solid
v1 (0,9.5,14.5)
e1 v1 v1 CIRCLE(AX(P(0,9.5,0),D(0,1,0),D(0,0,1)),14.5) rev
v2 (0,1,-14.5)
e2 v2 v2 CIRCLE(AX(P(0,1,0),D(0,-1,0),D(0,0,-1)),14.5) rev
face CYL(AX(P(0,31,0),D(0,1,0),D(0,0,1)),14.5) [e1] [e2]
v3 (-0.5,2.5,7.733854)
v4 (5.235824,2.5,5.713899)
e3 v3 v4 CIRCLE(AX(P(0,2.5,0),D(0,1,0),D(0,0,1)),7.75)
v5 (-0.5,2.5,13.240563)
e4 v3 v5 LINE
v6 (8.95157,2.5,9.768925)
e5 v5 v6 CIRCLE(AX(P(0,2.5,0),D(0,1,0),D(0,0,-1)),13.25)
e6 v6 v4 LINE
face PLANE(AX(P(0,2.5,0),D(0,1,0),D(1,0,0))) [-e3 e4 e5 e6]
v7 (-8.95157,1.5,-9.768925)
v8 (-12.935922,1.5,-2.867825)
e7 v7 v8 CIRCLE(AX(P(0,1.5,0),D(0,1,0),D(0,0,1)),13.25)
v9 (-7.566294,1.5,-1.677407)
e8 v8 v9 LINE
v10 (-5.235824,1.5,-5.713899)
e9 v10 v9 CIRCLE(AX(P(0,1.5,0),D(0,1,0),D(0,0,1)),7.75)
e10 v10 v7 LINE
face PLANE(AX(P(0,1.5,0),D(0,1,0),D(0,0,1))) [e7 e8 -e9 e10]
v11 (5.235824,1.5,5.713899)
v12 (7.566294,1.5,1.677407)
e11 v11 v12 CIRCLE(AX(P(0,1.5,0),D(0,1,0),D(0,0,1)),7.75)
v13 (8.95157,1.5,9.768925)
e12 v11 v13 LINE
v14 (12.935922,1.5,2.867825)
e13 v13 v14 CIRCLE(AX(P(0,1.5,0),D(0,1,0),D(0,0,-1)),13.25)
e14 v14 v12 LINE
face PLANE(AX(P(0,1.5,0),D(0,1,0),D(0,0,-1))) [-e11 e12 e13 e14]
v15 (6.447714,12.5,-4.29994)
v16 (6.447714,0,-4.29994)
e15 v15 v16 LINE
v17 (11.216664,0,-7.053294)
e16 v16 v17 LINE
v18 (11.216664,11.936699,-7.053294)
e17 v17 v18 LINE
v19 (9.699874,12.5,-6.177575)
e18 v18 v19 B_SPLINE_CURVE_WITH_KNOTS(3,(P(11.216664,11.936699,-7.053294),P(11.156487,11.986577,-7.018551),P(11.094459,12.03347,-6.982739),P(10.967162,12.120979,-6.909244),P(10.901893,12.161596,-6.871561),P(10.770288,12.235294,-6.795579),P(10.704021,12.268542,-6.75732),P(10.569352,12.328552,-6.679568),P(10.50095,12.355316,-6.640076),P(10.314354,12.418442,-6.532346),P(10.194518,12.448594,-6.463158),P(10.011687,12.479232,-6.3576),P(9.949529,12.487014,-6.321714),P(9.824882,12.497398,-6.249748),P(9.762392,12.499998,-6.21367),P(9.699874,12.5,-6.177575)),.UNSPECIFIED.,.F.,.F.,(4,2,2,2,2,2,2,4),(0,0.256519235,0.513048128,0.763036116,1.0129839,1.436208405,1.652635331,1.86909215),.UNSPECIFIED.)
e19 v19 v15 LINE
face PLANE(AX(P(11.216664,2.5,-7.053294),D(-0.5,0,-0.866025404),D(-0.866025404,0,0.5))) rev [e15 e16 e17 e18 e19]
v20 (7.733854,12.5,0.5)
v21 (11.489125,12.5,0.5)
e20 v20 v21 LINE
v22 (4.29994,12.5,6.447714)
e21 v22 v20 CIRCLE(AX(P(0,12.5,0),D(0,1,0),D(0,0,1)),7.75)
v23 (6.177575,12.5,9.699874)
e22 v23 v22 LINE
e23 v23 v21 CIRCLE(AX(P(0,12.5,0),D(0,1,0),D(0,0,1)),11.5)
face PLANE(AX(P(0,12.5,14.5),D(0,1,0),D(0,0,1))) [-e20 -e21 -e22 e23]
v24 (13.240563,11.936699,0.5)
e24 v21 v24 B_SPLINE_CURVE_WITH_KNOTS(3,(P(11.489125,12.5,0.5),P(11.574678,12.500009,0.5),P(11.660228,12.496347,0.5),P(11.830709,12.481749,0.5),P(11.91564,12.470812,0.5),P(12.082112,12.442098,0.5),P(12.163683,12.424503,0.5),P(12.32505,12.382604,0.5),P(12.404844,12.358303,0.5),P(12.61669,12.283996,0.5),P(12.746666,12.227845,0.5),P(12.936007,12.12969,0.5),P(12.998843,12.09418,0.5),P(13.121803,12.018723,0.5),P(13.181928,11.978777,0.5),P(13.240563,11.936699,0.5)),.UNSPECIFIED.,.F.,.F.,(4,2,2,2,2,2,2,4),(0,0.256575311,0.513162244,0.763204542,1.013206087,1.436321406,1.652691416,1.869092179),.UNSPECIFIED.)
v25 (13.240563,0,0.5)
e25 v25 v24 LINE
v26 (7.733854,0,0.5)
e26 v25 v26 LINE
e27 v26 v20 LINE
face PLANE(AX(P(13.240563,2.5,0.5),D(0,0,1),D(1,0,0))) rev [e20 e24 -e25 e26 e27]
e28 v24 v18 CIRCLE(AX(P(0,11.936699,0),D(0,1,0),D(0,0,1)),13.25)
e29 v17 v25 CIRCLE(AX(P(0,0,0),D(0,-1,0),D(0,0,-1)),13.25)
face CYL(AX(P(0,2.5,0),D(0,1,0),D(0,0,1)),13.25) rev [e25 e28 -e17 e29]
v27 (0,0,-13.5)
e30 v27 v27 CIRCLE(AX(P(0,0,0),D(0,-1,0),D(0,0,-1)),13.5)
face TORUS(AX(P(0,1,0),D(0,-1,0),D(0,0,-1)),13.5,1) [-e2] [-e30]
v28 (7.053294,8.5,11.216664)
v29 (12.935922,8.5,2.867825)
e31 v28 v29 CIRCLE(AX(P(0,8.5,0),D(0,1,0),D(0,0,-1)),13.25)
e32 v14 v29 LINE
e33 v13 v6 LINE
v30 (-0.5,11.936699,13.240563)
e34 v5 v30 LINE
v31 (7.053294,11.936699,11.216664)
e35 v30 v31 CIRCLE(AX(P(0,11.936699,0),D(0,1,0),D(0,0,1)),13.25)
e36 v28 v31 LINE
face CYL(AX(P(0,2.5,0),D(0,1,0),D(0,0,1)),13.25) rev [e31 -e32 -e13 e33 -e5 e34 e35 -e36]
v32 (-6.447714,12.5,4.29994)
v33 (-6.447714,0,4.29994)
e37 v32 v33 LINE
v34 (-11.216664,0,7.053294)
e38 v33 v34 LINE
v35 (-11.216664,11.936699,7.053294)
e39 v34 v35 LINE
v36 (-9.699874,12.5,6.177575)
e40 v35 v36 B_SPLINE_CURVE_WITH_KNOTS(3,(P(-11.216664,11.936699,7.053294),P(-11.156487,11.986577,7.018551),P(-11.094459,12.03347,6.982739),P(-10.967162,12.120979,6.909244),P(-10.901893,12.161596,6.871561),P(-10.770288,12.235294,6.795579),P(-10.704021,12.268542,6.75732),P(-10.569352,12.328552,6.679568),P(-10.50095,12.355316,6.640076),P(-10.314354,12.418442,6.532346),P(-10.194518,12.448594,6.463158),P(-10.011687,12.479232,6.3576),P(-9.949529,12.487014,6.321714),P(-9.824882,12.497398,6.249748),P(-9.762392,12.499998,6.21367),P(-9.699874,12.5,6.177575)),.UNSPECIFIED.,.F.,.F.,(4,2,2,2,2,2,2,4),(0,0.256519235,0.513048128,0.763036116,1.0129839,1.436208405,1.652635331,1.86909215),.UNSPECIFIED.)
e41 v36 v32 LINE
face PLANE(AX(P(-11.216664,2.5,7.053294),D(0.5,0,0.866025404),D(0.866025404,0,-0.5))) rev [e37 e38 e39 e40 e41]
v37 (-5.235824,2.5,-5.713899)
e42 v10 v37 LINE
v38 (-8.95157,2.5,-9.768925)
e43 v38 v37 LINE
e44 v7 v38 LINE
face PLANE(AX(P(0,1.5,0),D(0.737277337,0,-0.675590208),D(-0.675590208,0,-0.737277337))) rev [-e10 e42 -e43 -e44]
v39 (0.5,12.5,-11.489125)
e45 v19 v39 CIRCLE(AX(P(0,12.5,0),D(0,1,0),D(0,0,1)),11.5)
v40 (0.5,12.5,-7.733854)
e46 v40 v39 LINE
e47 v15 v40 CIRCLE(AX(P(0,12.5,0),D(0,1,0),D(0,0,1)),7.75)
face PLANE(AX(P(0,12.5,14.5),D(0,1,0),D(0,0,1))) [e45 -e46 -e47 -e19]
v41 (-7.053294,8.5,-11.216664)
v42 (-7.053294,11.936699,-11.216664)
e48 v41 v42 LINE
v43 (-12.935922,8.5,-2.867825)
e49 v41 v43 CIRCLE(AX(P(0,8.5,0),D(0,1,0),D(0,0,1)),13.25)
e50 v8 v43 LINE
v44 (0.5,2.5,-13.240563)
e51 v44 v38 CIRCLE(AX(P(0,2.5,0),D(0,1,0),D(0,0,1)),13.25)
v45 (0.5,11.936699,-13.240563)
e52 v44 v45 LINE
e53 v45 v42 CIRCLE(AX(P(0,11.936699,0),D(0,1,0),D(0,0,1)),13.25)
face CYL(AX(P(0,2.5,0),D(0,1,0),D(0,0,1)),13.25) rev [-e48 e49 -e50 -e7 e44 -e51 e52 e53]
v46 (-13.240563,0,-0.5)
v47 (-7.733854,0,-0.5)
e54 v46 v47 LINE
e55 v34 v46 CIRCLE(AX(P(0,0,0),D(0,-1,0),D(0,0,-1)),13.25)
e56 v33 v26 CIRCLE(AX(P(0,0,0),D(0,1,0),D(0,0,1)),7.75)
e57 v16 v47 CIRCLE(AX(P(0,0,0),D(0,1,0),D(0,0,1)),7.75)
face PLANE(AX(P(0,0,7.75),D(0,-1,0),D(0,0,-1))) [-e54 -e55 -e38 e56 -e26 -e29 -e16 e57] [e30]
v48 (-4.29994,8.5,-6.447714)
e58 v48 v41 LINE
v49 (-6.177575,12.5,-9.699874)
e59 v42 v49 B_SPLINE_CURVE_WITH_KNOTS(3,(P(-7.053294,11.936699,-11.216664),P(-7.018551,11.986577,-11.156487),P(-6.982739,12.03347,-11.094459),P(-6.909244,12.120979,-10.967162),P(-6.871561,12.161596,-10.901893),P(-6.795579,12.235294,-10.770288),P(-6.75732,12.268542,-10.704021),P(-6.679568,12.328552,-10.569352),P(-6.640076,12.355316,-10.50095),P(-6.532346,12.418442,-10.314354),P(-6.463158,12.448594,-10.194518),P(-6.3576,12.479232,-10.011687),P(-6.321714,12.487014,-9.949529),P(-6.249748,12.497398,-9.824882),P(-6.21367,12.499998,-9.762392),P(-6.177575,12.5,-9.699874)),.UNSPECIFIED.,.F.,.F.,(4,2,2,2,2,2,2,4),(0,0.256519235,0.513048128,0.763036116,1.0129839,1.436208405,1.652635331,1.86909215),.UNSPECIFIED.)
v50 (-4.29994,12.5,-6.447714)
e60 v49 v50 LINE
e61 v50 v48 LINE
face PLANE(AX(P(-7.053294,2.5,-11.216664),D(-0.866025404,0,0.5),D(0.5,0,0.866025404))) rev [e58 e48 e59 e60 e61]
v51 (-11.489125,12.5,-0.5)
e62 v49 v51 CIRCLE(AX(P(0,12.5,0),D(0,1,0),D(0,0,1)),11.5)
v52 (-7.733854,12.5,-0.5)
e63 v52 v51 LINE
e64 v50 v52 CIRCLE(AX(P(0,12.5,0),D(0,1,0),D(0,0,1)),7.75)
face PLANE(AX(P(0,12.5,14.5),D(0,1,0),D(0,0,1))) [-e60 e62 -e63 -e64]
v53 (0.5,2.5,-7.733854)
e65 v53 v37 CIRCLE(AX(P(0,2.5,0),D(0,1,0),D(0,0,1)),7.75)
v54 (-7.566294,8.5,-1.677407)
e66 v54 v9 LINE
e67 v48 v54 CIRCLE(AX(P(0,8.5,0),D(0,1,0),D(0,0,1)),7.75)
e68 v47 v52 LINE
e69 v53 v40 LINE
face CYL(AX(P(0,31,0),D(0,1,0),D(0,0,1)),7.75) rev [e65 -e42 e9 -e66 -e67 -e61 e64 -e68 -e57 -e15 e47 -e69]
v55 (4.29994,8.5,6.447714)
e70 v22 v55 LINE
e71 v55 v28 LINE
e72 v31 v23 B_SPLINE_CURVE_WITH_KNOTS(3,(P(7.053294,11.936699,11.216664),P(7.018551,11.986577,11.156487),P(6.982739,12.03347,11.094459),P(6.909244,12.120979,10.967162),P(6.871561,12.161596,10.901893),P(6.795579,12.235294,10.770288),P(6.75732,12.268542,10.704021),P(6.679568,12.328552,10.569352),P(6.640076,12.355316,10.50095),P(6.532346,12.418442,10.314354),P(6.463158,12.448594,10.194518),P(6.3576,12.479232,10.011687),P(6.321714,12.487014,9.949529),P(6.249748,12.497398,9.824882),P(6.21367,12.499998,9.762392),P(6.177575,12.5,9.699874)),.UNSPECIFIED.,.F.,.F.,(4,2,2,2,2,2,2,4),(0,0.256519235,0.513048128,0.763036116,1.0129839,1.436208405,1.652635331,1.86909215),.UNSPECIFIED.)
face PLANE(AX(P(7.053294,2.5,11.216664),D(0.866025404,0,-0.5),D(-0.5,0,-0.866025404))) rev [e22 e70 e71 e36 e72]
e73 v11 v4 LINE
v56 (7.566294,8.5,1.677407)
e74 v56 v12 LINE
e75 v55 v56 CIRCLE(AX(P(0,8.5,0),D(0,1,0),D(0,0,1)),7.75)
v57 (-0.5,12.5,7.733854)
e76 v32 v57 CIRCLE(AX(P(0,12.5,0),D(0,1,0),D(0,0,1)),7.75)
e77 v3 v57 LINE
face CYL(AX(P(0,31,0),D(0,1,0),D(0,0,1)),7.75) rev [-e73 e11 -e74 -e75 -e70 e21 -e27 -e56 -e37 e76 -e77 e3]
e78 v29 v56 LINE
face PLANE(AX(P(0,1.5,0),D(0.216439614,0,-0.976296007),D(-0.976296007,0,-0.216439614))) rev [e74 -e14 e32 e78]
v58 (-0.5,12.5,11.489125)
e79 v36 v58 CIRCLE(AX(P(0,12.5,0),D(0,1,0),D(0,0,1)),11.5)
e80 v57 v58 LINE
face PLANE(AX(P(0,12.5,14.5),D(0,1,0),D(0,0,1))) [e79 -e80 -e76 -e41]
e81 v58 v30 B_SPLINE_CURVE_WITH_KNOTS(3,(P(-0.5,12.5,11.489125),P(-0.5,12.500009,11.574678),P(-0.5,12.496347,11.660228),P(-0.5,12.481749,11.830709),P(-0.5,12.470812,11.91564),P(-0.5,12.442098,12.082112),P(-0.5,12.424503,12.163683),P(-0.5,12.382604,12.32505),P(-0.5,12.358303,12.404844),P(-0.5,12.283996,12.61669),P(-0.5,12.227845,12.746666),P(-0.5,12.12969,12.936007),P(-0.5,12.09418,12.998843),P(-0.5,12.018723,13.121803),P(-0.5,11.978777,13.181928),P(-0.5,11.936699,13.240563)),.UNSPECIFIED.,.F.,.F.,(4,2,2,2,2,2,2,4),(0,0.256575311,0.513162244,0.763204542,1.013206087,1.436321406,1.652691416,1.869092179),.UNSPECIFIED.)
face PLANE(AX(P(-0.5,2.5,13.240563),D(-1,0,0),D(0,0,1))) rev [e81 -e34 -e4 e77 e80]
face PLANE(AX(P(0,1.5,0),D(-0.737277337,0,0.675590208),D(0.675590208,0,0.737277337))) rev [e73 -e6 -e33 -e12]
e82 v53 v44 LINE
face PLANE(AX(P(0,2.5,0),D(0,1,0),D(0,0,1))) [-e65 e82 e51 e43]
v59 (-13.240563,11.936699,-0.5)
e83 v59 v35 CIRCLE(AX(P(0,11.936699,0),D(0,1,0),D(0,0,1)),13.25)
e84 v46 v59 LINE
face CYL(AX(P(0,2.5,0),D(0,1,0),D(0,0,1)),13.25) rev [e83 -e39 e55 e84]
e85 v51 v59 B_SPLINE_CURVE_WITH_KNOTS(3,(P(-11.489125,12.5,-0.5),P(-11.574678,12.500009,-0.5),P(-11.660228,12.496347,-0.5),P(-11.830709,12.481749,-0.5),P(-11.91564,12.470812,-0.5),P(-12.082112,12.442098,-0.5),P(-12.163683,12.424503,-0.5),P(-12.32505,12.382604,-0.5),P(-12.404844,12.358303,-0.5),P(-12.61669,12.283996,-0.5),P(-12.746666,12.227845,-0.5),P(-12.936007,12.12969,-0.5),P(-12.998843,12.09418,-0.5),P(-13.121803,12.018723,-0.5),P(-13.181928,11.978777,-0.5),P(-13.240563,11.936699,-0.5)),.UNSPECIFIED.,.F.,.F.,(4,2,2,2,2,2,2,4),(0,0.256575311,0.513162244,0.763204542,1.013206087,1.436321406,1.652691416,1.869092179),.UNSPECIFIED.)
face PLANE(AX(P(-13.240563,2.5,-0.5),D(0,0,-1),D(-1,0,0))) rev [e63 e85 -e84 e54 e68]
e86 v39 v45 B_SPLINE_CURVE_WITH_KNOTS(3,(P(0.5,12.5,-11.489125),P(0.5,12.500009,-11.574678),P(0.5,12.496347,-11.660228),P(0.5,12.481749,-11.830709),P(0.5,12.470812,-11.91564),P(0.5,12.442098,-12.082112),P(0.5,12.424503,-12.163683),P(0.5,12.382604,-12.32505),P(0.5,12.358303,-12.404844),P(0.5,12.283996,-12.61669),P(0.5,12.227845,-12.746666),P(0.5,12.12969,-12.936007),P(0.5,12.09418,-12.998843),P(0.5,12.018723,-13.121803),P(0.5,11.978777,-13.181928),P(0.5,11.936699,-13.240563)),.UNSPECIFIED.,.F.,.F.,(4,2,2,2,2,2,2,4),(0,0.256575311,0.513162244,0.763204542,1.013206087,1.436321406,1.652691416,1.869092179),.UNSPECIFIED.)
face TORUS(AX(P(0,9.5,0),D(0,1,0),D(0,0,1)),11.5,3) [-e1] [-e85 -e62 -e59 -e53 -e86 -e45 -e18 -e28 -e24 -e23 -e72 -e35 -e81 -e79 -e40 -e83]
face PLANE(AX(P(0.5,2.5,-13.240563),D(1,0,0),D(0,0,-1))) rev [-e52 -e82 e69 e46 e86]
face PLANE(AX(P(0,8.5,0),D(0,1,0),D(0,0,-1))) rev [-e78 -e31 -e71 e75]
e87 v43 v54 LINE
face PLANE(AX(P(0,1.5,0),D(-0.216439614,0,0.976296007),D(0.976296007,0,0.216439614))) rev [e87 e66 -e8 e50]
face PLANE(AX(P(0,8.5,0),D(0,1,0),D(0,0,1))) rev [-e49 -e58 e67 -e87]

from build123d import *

# Parameters (mm, degrees)
SKETCH2_W          = 6.75
SKETCH2_H          = 12.5
CUT_EXTRUDE1_DEPTH = 10
CIRPATTERN1_COUNT  = 4
CUT_EXTRUDE2_DEPTH = 10
CUT_EXTRUDE3_START = 6
CUT_EXTRUDE3_DEPTH = 7
FILLET1_R          = 3
CUT_EXTRUDE5_START = 6
CUT_EXTRUDE5_DEPTH = 6
CIRPATTERN2_COUNT  = 2
FILLET2_R          = 1


with BuildPart() as part:
    # Sketch2 → Revolve1 (revolve)
    with BuildSketch(Plane(origin=(0, 0, 0), x_dir=(0, 0, -1), z_dir=(1, 0, 0))):
        with Locations((-11.125, 6.25)):
            Rectangle(SKETCH2_W, SKETCH2_H)
    revolve(axis=Axis((0, 31, 0), (0, -1, 0)))

    # Sketch3 → Cut-Extrude1 (cut)
    with BuildSketch(Plane(origin=(0, 12.5, 0), x_dir=(1, 0, 0), z_dir=(0, 1, 0))):
        with BuildLine():
            Line((-7.05329404, 11.216663639), (0.5, -1.866025404))
            Line((0.5, -1.866025404), (0.5, 13.240562677))
            ThreePointArc((0.5, 13.240562677), (-3.429352348, 12.798517198), (-7.05329404, 11.216663639))
        make_face()
    cut_extrude1 = extrude(amount=-CUT_EXTRUDE1_DEPTH, mode=Mode.SUBTRACT)

    # CirPattern1: Cut-Extrude1 ×4 about axis
    cirpattern1_axis = Axis((0, 0, 0), (0, 1, 0))
    for i in range(1, CIRPATTERN1_COUNT):
        add(cut_extrude1.rotate(cirpattern1_axis, i * 360 / CIRPATTERN1_COUNT), mode=Mode.SUBTRACT)

    # Sketch4 → Cut-Extrude2 (cut)
    with BuildSketch(Plane(origin=(0, 2.5, 0), x_dir=(1, 0, 0), z_dir=(0, 1, 0))):
        with BuildLine():
            Line((-7.733854149, 0.5), (-13.240562677, 0.5))
            ThreePointArc((-13.240562677, 0.5), (-12.798517198, -3.429352348), (-11.216663639, -7.05329404))
            Line((-11.216663639, -7.05329404), (-6.447714162, -4.299939776))
            ThreePointArc((-6.447714162, -4.299939776), (-7.485925154, -2.0058476), (-7.733854149, 0.5))
        make_face()
    cut_extrude2 = extrude(amount=-CUT_EXTRUDE2_DEPTH, mode=Mode.SUBTRACT)

    # Sketch5 → Cut-Extrude3 (cut)
    with BuildSketch(Plane(origin=(0, 2.5, 0), x_dir=(1, 0, 0), z_dir=(0, 1, 0)).offset(CUT_EXTRUDE3_START)):
        with BuildLine():
            Line((0, 0), (-8.951570251, 9.768924713))
            ThreePointArc((-8.951570251, 9.768924713), (-11.4748366, 6.625), (-12.935922094, 2.867824885))
            Line((-12.935922094, 2.867824885), (0, 0))
        make_face()
    cut_extrude3 = extrude(amount=-CUT_EXTRUDE3_DEPTH, mode=Mode.SUBTRACT)

    # Fillet1
    # the kernel refuses this fillet: 3 mm, written as the material it takes off along each edge
    with BuildSketch(Plane(origin=(0, 12.5, 0), x_dir=(0, 0, 1), z_dir=(1, 0, 0))) as fillet1_piece_1:
        with BuildLine():
            CenterArc((14.5 - FILLET1_R, FILLET1_R), FILLET1_R, 270, 90)
            Line((14.5 - FILLET1_R, 0), (14.5, 0))
            Line((14.5, 0), (14.5, FILLET1_R))
        make_face()
    revolve(axis=Axis((0, 12.5, 0), (0, -1, 0)), mode=Mode.SUBTRACT)

    # Sketch8 → Cut-Extrude5 (cut)
    with BuildSketch(Plane(origin=(0, 2.5, 0), x_dir=(1, 0, 0), z_dir=(0, 1, 0)).offset(CUT_EXTRUDE5_START)):
        with BuildLine():
            Line((-4.299939776, 6.447714162), (-7.05329404, 11.216663639))
            ThreePointArc((-7.05329404, 11.216663639), (-8.035104682, 10.535634426), (-8.951570251, 9.768924713))
            Line((-8.951570251, 9.768924713), (-5.235824109, 5.71389936))
            ThreePointArc((-5.235824109, 5.71389936), (-4.781978593, 6.098785186), (-4.299939776, 6.447714162))
        make_face()
    cut_extrude5 = extrude(amount=-CUT_EXTRUDE5_DEPTH, mode=Mode.SUBTRACT)

    # CirPattern2: Cut-Extrude2, Cut-Extrude3, Cut-Extrude5 ×2 about axis
    cirpattern2_axis = Axis((0, 0, 0), (0, 1, 0))
    add([cut_extrude2.rotate(cirpattern2_axis, i * 360 / CIRPATTERN2_COUNT) for i in range(1, CIRPATTERN2_COUNT)], mode=Mode.SUBTRACT)
    add([cut_extrude3.rotate(cirpattern2_axis, i * 360 / CIRPATTERN2_COUNT) for i in range(1, CIRPATTERN2_COUNT)], mode=Mode.SUBTRACT)
    add([cut_extrude5.rotate(cirpattern2_axis, i * 360 / CIRPATTERN2_COUNT) for i in range(1, CIRPATTERN2_COUNT)], mode=Mode.SUBTRACT)

    # Fillet2
    fillet2_edges = [part.edges().sort_by_distance(p)[0] for p in [
        (0, 0, -14.5),
    ]]
    fillet(fillet2_edges, radius=FILLET2_R)


solid = part.part
